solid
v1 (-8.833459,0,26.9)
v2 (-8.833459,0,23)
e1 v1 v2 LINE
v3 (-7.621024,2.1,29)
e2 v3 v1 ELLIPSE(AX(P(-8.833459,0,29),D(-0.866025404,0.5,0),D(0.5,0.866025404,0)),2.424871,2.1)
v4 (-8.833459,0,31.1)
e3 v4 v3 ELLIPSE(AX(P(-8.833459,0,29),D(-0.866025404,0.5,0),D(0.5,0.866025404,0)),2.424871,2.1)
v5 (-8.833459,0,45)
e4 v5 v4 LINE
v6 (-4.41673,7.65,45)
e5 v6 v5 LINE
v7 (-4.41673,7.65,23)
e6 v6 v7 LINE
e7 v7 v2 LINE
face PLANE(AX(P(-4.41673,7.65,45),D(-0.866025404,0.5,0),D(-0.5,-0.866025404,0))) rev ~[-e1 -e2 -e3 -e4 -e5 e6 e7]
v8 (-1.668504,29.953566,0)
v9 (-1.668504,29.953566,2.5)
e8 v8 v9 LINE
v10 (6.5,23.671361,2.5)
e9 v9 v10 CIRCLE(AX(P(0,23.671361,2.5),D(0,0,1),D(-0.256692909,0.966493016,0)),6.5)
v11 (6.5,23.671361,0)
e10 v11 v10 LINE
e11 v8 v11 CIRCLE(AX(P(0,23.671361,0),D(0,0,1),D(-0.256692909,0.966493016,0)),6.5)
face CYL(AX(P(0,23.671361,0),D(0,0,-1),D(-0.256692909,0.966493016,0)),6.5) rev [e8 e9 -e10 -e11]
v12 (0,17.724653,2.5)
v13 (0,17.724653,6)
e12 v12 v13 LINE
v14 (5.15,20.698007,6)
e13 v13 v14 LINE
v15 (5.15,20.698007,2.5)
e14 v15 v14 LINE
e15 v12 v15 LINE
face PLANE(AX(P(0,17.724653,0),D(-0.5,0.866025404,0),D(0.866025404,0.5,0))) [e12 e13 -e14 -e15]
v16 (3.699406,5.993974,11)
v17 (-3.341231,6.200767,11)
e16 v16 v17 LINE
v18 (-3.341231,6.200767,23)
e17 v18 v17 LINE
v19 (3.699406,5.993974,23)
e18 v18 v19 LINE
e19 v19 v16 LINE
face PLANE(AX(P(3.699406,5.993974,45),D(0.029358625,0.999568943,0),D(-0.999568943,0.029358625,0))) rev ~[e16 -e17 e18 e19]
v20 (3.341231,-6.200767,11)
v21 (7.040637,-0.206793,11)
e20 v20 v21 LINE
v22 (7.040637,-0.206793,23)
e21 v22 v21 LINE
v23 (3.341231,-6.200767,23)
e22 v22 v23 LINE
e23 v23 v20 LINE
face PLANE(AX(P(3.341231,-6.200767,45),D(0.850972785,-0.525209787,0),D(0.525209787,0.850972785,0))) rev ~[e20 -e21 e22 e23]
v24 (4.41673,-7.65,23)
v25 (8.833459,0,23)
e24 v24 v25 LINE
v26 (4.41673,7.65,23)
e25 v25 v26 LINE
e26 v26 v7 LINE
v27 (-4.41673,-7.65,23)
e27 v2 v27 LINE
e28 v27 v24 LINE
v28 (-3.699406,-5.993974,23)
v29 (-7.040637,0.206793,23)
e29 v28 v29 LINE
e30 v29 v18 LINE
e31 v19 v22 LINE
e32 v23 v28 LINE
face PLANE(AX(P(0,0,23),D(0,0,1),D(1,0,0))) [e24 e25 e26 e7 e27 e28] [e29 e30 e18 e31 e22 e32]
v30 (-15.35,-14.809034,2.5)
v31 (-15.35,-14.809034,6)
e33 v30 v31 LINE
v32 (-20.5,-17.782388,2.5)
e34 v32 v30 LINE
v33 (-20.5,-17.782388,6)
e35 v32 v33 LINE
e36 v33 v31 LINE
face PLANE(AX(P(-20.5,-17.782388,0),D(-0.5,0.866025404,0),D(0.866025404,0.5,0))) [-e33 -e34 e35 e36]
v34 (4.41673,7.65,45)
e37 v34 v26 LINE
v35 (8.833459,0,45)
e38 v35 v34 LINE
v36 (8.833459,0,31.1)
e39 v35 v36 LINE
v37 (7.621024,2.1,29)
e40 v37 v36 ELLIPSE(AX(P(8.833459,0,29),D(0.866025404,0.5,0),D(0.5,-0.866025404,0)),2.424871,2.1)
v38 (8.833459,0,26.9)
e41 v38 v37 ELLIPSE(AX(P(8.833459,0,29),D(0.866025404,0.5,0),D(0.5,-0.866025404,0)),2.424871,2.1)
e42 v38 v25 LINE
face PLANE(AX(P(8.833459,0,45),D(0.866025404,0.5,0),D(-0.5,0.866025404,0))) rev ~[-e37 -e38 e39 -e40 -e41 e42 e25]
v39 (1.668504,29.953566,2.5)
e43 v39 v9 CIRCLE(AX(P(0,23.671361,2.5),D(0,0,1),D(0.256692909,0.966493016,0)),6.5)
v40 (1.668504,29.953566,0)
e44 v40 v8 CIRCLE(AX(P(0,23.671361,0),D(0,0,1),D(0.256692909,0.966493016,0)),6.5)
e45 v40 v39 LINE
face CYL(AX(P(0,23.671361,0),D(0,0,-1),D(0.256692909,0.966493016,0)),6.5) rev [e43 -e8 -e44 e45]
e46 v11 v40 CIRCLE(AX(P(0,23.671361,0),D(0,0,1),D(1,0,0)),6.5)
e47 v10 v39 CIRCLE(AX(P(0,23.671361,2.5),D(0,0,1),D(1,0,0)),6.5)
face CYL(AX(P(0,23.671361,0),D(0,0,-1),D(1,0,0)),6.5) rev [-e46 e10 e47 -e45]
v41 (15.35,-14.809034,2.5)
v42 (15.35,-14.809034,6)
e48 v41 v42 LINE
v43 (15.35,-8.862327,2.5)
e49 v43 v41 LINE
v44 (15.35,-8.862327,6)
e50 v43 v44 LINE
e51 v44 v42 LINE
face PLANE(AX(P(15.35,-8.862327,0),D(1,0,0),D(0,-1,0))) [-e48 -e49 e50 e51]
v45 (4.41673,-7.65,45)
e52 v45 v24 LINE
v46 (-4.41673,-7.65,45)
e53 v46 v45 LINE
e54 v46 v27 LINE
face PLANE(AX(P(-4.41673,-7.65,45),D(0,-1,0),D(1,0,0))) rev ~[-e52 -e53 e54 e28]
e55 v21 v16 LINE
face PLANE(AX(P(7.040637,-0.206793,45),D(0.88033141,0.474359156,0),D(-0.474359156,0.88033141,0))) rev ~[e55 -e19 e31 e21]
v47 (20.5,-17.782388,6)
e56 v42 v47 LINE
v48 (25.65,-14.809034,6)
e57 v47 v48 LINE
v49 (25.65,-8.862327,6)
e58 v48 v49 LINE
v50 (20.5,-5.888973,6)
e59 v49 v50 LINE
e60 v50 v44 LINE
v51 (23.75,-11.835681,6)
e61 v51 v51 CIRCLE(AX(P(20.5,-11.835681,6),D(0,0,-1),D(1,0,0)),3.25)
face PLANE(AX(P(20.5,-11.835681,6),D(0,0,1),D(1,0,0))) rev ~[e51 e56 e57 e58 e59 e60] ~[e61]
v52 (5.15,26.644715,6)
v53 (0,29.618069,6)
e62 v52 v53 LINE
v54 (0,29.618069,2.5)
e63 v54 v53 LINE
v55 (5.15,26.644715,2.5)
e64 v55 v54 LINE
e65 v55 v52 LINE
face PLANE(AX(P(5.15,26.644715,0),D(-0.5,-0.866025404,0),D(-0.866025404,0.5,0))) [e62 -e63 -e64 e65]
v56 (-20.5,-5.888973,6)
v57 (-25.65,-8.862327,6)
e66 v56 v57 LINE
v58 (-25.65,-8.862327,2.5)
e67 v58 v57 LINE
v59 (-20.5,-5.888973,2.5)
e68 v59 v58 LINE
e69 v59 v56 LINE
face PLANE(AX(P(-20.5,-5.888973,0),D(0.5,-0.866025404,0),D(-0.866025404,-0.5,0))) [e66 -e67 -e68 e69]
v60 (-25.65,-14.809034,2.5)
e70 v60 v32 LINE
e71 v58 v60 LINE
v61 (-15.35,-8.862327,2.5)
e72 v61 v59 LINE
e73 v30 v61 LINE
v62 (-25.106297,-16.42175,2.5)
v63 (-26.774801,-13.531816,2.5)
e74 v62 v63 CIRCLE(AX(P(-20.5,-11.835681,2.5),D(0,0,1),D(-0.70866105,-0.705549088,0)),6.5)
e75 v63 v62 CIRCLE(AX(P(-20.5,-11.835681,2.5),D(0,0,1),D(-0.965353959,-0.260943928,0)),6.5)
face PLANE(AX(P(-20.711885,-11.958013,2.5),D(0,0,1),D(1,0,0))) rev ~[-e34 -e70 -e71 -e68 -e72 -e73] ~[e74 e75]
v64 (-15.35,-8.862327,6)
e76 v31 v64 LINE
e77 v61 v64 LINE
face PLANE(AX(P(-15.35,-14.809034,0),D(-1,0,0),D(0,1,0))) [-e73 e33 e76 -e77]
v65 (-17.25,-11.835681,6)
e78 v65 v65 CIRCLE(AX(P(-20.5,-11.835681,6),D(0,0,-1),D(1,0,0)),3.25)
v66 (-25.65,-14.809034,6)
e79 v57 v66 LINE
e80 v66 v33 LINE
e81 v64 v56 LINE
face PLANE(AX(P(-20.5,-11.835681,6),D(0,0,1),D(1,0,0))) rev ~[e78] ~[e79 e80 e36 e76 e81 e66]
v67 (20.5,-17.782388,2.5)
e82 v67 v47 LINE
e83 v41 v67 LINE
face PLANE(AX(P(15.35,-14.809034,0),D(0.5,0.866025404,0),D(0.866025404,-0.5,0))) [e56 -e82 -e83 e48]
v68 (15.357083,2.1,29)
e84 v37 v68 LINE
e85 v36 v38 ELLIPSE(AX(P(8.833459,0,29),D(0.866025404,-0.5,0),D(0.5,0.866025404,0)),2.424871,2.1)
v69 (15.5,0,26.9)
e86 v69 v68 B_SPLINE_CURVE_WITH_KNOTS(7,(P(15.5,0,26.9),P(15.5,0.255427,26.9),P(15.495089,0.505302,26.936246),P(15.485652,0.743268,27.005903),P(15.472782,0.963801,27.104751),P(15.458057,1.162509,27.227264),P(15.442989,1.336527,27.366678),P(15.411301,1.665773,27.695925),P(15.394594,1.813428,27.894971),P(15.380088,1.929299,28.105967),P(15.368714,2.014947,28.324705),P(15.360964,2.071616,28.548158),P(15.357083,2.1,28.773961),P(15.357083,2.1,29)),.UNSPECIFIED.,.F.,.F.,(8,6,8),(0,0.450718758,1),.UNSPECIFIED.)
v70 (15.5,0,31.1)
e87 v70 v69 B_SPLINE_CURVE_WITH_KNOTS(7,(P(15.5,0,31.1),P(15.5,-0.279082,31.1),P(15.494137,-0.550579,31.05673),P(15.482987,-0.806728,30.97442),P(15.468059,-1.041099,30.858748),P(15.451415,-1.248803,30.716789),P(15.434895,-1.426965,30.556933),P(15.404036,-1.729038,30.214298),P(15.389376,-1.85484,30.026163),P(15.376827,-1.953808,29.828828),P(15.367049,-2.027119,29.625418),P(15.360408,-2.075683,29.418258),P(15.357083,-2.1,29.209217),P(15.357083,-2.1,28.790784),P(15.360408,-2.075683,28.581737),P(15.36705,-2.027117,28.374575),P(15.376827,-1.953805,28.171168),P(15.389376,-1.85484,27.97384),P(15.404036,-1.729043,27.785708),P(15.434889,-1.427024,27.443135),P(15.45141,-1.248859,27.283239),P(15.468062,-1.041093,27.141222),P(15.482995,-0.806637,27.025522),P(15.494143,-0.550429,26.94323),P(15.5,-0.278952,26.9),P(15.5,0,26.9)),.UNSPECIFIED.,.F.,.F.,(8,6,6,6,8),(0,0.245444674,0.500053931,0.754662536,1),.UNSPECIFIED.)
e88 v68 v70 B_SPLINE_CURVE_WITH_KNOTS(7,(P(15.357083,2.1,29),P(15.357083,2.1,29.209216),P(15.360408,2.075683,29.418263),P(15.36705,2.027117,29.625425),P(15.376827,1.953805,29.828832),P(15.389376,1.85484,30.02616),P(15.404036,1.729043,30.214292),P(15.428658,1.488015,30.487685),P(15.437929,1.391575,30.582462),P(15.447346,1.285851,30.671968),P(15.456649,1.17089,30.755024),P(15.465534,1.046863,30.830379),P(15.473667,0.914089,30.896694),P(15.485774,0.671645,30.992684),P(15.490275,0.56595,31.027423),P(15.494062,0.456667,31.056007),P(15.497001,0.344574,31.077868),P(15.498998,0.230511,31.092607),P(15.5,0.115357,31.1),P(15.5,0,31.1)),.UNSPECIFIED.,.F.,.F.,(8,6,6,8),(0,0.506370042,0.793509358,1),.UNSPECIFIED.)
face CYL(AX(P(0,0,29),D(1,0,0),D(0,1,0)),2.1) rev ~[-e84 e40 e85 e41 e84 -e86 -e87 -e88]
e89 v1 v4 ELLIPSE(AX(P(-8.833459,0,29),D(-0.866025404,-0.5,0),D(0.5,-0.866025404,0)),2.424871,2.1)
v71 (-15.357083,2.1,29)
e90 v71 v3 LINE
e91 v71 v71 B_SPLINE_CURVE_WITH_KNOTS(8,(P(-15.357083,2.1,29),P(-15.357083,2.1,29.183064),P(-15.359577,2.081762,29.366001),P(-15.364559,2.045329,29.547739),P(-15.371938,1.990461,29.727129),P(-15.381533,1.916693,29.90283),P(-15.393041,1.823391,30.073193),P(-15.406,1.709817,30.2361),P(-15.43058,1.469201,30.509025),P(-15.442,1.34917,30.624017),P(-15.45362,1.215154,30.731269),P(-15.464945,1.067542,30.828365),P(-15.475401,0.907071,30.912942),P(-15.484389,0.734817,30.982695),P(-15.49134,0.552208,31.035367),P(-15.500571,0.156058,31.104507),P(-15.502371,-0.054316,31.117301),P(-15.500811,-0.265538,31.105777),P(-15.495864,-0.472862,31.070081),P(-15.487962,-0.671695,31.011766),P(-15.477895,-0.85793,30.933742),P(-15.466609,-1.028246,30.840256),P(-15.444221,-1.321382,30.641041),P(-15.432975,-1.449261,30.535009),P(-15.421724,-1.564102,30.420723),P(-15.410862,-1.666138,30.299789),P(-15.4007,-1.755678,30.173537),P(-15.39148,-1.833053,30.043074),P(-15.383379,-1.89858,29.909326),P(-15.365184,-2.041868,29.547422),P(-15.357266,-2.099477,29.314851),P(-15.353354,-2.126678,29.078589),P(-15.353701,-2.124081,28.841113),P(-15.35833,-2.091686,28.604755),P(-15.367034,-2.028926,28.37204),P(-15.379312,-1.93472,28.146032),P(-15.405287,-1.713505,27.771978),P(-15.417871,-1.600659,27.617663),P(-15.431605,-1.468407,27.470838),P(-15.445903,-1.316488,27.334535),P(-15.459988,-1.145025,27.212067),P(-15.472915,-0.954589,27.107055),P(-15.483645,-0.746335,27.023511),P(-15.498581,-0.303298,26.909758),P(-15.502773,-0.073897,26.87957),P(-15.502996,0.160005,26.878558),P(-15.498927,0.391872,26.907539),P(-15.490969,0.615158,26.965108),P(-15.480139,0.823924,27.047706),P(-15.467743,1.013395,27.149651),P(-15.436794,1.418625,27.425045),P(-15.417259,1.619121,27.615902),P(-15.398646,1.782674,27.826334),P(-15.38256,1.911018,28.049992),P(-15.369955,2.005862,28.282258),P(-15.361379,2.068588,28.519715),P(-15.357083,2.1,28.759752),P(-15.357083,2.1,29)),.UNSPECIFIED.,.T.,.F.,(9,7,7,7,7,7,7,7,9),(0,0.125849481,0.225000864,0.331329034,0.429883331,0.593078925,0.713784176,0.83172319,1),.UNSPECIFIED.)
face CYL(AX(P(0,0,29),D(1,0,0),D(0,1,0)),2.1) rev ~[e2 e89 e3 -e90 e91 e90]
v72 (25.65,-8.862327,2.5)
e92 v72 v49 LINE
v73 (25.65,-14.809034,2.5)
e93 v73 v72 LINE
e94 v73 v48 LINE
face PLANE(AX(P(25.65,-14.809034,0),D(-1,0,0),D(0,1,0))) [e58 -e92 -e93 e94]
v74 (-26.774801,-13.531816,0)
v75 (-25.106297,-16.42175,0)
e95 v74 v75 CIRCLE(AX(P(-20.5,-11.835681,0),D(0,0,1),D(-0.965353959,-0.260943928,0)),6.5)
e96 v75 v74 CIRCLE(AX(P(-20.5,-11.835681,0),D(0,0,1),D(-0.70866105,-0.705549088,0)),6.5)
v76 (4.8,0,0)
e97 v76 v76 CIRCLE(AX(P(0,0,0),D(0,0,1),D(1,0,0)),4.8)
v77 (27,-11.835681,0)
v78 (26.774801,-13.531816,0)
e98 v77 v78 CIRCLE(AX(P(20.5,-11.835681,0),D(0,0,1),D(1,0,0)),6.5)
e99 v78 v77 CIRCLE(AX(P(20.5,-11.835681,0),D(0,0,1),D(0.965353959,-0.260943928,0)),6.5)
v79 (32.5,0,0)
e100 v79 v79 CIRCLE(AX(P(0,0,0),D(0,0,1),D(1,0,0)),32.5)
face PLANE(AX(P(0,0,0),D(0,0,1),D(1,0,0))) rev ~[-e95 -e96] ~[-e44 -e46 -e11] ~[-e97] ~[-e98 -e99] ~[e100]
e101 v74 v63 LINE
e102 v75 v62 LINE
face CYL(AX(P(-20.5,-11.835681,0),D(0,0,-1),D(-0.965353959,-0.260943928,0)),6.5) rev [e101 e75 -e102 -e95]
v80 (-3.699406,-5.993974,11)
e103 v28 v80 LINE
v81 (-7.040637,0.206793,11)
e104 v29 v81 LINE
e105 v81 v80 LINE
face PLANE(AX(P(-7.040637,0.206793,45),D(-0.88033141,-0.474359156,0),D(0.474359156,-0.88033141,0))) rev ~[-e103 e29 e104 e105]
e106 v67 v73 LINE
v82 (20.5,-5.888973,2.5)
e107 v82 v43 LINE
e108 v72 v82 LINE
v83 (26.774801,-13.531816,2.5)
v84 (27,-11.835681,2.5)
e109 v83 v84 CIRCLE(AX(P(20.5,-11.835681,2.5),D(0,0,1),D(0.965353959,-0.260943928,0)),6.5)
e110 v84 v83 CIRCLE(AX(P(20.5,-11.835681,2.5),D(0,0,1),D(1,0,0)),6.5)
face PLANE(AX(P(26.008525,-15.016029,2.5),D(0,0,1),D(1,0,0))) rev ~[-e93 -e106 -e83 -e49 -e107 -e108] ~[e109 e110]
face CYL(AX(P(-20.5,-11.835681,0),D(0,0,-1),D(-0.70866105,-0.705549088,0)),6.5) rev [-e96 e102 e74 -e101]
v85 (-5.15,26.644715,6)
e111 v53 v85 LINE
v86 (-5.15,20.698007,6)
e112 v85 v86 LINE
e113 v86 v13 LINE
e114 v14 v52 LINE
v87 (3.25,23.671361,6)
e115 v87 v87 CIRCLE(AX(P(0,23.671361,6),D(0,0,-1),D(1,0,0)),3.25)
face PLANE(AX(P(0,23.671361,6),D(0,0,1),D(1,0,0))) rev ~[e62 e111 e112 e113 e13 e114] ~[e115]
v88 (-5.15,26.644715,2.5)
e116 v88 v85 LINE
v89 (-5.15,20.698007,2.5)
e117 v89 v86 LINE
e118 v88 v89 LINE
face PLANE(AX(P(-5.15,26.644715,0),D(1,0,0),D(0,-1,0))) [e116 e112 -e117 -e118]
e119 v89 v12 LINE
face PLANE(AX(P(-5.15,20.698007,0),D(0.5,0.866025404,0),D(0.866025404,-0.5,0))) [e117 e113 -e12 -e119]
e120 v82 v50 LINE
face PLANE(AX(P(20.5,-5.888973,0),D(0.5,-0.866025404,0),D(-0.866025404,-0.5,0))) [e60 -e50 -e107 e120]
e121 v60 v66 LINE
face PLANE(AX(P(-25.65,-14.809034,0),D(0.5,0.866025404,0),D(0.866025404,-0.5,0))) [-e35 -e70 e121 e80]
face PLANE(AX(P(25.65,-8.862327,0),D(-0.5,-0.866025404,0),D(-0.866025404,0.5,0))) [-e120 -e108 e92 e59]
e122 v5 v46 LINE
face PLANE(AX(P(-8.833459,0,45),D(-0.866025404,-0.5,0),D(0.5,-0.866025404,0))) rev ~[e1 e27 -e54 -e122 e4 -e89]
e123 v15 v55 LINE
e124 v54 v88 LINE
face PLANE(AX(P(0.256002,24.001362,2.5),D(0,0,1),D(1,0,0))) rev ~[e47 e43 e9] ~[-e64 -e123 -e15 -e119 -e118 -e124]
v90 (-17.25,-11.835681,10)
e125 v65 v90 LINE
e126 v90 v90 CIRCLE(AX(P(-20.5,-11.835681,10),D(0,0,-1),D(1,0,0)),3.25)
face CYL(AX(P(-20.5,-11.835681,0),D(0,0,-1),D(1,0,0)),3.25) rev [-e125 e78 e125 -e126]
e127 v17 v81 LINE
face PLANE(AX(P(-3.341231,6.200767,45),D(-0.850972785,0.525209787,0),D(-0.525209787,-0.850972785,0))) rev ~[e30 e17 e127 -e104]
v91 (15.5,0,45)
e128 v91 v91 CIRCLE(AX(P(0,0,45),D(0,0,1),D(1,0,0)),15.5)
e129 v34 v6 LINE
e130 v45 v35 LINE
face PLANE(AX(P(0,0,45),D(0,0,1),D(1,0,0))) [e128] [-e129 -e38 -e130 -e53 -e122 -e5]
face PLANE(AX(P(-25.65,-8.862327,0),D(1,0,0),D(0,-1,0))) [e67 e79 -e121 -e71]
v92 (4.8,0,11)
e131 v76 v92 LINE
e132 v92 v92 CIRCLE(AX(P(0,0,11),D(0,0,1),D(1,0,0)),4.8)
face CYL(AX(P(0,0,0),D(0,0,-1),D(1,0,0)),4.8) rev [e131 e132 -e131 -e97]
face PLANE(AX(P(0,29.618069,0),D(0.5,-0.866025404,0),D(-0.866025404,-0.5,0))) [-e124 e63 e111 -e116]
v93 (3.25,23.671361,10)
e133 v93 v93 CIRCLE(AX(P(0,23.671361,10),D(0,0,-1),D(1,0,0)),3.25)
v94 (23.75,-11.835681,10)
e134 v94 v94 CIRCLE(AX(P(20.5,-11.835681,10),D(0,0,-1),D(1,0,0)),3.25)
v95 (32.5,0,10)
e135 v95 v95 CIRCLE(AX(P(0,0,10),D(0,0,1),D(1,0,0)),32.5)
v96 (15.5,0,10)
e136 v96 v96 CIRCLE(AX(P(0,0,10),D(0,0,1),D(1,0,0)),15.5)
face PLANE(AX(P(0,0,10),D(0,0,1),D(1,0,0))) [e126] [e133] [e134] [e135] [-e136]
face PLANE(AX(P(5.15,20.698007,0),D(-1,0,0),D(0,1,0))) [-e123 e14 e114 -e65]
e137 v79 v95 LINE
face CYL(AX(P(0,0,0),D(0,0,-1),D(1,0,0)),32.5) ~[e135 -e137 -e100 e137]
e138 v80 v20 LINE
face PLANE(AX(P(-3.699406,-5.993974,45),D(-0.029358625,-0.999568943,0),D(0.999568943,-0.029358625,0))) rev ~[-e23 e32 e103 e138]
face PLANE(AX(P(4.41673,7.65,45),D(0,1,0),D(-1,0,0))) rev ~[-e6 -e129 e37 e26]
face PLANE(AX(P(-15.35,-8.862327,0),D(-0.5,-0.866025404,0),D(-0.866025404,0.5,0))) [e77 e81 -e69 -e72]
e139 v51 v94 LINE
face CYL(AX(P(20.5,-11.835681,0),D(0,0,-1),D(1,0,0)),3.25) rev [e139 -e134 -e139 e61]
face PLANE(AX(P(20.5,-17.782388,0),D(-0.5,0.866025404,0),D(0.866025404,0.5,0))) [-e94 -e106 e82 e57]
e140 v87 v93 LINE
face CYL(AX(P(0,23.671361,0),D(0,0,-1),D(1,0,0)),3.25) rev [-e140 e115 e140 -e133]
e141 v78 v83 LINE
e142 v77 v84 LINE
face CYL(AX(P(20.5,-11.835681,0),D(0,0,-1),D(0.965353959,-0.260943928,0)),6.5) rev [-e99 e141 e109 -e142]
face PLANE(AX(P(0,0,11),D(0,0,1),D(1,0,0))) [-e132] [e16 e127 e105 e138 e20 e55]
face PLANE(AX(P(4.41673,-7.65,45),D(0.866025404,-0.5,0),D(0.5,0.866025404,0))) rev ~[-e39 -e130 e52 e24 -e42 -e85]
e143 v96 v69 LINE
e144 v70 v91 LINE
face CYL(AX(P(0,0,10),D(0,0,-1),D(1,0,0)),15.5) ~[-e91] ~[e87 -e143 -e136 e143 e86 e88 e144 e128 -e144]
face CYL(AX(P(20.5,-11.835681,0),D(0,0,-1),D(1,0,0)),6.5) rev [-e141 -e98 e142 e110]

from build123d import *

# Parameters (mm, degrees)
F0_R      = 32.5
F1_DEPTH  = 10
F2_R      = 15.5
F3_DEPTH  = 35
F5_R      = 4.8
F6_DEPTH  = 45.001
F7_R      = 4.8
F8_DEPTH  = 34
F10_DEPTH = 22
F12_DEPTH = 6
F13_R     = 2.1
F14_DEPTH = 25
F15_R     = 3.25
F16_DEPTH = 45.0010001
F17_R     = 3.25
F18_DEPTH = 2.5


# Not quite as in the source:
# - a feature names something its author has since deleted; it is built from what else it names


with BuildPart() as f1:
    # F0 (on Top) → F1 (new body)
    with BuildSketch(Plane.XY):
        Circle(F0_R)
    extrude(amount=F1_DEPTH)

    # F2 (on face) → F3 (join)
    with BuildSketch(Plane.XY.offset(10)):
        Circle(F2_R)
    extrude(amount=F3_DEPTH)

    # F5 (on face) → F6 (cut, through all)
    with BuildSketch(Plane.XY):
        Circle(F5_R)
    extrude(amount=F6_DEPTH, mode=Mode.SUBTRACT)

    # F7 (on face) → F8 (cut)
    with BuildSketch(Plane.XY.offset(45)):
        Polygon((3.3412309145, -6.2007668324), (7.040637057, -0.2067925644), (3.6994061426, 5.993974268), (-3.3412309145, 6.2007668324), (-7.040637057, 0.2067925644), (-3.6994061426, -5.993974268), align=None)
        Circle(F7_R, mode=Mode.SUBTRACT)
    extrude(amount=-F8_DEPTH, mode=Mode.SUBTRACT)

    # F9 (on face) → F10 (cut)
    with BuildSketch(Plane.XY.offset(45)):
        Polygon((-4.4167295593, -7.65), (4.4167295593, -7.65), (8.8334591186, 0), (4.4167295593, 7.65), (-4.4167295593, 7.65), (-8.8334591186, 0), align=None)
        Polygon((3.3412309145, -6.2007668324), (-3.6994061426, -5.993974268), (-7.040637057, 0.2067925644), (-3.3412309145, 6.2007668324), (3.6994061426, 5.993974268), (7.040637057, -0.2067925644), align=None, mode=Mode.SUBTRACT)
    extrude(amount=-F10_DEPTH, mode=Mode.SUBTRACT)

    # F11 (on face) → F12 (cut)
    with BuildSketch(Plane.XY):
        Polygon((-15.35, -8.8623266321), (-20.5, -5.8889727457), (-25.65, -8.8623266321), (-25.65, -14.8090344047), (-20.5, -17.782388291), (-15.35, -14.8090344047), align=None)
        Polygon((0, 29.6180688094), (-5.15, 26.6447149231), (-5.15, 20.6980071504), (0, 17.7246532641), (5.15, 20.6980071504), (5.15, 26.6447149231), align=None)
        Polygon((25.65, -14.8090344047), (25.65, -8.8623266321), (20.5, -5.8889727457), (15.35, -8.8623266321), (15.35, -14.8090344047), (20.5, -17.782388291), align=None)
    extrude(amount=F12_DEPTH, mode=Mode.SUBTRACT)

    # F13 (on Right) → F14 (cut, symmetric)
    with BuildSketch(Plane.YZ):
        with Locations((0, 29)):
            Circle(F13_R)
    extrude(amount=F14_DEPTH, both=True, mode=Mode.SUBTRACT)

    # F15 (on face) → F16 (cut, through all)
    with BuildSketch(Plane.XY):
        with Locations((-20.5, -11.8356805184)):
            Circle(F15_R)
        with Locations((0, 23.6713610368)):
            Circle(F15_R)
        with Locations((20.5, -11.8356805184)):
            Circle(F15_R)
    extrude(amount=F16_DEPTH, mode=Mode.SUBTRACT)

    # F17 (on face) → F18 (cut)
    with BuildSketch(Plane.XY):
        with BuildLine():
            ThreePointArc((-25.1062968267, -16.4217495916), (-18.0191664076, -17.8436306419), (-14, -11.8356805184))
            ThreePointArc((-14, -11.8356805184), (-21.3555101482, -5.3922262905), (-26.7748007343, -13.5318160511))
            ThreePointArc((-26.7748007343, -13.5318160511), (-25.9807621135, -15), (-25.1062968267, -16.4217495916))
        make_face()
        with Locations((-20.5, -11.8356805184)):
            Circle(F17_R, mode=Mode.SUBTRACT)
        with BuildLine():
            ThreePointArc((-25.1062968267, -16.4217495916), (-25.9807621135, -15), (-26.7748007343, -13.5318160511))
            ThreePointArc((-26.7748007343, -13.5318160511), (-26.1291651246, -15.0856805184), (-25.1062968267, -16.4217495916))
        make_face()
        with BuildLine():
            ThreePointArc((1.6685039075, 29.9535656427), (0, 30), (-1.6685039075, 29.9535656427))
            ThreePointArc((-1.6685039075, 29.9535656427), (-3.9626206354, 18.5189210614), (6.5, 23.6713610368))
            ThreePointArc((6.5, 23.6713610368), (5.1524399753, 27.6339816722), (1.6685039075, 29.9535656427))
        make_face()
        with BuildLine():
            ThreePointArc((1.6685039075, 29.9535656427), (0, 30.1713610368), (-1.6685039075, 29.9535656427))
            ThreePointArc((-1.6685039075, 29.9535656427), (0, 30), (1.6685039075, 29.9535656427))
        make_face()
        with BuildLine():
            ThreePointArc((26.7748007343, -13.5318160511), (25.9807621135, -15), (25.1062968267, -16.4217495916))
            ThreePointArc((25.1062968267, -16.4217495916), (26.1291651246, -15.0856805184), (26.7748007343, -13.5318160511))
        make_face()
        with BuildLine():
            ThreePointArc((27, -11.8356805184), (14.4920498765, -9.354846926), (25.1062968267, -16.4217495916))
            ThreePointArc((25.1062968267, -16.4217495916), (25.9807621135, -15), (26.7748007343, -13.5318160511))
            ThreePointArc((26.7748007343, -13.5318160511), (26.9434542278, -12.6911906666), (27, -11.8356805184))
        make_face()
    extrude(amount=F18_DEPTH, mode=Mode.SUBTRACT)


solid = f1.part
